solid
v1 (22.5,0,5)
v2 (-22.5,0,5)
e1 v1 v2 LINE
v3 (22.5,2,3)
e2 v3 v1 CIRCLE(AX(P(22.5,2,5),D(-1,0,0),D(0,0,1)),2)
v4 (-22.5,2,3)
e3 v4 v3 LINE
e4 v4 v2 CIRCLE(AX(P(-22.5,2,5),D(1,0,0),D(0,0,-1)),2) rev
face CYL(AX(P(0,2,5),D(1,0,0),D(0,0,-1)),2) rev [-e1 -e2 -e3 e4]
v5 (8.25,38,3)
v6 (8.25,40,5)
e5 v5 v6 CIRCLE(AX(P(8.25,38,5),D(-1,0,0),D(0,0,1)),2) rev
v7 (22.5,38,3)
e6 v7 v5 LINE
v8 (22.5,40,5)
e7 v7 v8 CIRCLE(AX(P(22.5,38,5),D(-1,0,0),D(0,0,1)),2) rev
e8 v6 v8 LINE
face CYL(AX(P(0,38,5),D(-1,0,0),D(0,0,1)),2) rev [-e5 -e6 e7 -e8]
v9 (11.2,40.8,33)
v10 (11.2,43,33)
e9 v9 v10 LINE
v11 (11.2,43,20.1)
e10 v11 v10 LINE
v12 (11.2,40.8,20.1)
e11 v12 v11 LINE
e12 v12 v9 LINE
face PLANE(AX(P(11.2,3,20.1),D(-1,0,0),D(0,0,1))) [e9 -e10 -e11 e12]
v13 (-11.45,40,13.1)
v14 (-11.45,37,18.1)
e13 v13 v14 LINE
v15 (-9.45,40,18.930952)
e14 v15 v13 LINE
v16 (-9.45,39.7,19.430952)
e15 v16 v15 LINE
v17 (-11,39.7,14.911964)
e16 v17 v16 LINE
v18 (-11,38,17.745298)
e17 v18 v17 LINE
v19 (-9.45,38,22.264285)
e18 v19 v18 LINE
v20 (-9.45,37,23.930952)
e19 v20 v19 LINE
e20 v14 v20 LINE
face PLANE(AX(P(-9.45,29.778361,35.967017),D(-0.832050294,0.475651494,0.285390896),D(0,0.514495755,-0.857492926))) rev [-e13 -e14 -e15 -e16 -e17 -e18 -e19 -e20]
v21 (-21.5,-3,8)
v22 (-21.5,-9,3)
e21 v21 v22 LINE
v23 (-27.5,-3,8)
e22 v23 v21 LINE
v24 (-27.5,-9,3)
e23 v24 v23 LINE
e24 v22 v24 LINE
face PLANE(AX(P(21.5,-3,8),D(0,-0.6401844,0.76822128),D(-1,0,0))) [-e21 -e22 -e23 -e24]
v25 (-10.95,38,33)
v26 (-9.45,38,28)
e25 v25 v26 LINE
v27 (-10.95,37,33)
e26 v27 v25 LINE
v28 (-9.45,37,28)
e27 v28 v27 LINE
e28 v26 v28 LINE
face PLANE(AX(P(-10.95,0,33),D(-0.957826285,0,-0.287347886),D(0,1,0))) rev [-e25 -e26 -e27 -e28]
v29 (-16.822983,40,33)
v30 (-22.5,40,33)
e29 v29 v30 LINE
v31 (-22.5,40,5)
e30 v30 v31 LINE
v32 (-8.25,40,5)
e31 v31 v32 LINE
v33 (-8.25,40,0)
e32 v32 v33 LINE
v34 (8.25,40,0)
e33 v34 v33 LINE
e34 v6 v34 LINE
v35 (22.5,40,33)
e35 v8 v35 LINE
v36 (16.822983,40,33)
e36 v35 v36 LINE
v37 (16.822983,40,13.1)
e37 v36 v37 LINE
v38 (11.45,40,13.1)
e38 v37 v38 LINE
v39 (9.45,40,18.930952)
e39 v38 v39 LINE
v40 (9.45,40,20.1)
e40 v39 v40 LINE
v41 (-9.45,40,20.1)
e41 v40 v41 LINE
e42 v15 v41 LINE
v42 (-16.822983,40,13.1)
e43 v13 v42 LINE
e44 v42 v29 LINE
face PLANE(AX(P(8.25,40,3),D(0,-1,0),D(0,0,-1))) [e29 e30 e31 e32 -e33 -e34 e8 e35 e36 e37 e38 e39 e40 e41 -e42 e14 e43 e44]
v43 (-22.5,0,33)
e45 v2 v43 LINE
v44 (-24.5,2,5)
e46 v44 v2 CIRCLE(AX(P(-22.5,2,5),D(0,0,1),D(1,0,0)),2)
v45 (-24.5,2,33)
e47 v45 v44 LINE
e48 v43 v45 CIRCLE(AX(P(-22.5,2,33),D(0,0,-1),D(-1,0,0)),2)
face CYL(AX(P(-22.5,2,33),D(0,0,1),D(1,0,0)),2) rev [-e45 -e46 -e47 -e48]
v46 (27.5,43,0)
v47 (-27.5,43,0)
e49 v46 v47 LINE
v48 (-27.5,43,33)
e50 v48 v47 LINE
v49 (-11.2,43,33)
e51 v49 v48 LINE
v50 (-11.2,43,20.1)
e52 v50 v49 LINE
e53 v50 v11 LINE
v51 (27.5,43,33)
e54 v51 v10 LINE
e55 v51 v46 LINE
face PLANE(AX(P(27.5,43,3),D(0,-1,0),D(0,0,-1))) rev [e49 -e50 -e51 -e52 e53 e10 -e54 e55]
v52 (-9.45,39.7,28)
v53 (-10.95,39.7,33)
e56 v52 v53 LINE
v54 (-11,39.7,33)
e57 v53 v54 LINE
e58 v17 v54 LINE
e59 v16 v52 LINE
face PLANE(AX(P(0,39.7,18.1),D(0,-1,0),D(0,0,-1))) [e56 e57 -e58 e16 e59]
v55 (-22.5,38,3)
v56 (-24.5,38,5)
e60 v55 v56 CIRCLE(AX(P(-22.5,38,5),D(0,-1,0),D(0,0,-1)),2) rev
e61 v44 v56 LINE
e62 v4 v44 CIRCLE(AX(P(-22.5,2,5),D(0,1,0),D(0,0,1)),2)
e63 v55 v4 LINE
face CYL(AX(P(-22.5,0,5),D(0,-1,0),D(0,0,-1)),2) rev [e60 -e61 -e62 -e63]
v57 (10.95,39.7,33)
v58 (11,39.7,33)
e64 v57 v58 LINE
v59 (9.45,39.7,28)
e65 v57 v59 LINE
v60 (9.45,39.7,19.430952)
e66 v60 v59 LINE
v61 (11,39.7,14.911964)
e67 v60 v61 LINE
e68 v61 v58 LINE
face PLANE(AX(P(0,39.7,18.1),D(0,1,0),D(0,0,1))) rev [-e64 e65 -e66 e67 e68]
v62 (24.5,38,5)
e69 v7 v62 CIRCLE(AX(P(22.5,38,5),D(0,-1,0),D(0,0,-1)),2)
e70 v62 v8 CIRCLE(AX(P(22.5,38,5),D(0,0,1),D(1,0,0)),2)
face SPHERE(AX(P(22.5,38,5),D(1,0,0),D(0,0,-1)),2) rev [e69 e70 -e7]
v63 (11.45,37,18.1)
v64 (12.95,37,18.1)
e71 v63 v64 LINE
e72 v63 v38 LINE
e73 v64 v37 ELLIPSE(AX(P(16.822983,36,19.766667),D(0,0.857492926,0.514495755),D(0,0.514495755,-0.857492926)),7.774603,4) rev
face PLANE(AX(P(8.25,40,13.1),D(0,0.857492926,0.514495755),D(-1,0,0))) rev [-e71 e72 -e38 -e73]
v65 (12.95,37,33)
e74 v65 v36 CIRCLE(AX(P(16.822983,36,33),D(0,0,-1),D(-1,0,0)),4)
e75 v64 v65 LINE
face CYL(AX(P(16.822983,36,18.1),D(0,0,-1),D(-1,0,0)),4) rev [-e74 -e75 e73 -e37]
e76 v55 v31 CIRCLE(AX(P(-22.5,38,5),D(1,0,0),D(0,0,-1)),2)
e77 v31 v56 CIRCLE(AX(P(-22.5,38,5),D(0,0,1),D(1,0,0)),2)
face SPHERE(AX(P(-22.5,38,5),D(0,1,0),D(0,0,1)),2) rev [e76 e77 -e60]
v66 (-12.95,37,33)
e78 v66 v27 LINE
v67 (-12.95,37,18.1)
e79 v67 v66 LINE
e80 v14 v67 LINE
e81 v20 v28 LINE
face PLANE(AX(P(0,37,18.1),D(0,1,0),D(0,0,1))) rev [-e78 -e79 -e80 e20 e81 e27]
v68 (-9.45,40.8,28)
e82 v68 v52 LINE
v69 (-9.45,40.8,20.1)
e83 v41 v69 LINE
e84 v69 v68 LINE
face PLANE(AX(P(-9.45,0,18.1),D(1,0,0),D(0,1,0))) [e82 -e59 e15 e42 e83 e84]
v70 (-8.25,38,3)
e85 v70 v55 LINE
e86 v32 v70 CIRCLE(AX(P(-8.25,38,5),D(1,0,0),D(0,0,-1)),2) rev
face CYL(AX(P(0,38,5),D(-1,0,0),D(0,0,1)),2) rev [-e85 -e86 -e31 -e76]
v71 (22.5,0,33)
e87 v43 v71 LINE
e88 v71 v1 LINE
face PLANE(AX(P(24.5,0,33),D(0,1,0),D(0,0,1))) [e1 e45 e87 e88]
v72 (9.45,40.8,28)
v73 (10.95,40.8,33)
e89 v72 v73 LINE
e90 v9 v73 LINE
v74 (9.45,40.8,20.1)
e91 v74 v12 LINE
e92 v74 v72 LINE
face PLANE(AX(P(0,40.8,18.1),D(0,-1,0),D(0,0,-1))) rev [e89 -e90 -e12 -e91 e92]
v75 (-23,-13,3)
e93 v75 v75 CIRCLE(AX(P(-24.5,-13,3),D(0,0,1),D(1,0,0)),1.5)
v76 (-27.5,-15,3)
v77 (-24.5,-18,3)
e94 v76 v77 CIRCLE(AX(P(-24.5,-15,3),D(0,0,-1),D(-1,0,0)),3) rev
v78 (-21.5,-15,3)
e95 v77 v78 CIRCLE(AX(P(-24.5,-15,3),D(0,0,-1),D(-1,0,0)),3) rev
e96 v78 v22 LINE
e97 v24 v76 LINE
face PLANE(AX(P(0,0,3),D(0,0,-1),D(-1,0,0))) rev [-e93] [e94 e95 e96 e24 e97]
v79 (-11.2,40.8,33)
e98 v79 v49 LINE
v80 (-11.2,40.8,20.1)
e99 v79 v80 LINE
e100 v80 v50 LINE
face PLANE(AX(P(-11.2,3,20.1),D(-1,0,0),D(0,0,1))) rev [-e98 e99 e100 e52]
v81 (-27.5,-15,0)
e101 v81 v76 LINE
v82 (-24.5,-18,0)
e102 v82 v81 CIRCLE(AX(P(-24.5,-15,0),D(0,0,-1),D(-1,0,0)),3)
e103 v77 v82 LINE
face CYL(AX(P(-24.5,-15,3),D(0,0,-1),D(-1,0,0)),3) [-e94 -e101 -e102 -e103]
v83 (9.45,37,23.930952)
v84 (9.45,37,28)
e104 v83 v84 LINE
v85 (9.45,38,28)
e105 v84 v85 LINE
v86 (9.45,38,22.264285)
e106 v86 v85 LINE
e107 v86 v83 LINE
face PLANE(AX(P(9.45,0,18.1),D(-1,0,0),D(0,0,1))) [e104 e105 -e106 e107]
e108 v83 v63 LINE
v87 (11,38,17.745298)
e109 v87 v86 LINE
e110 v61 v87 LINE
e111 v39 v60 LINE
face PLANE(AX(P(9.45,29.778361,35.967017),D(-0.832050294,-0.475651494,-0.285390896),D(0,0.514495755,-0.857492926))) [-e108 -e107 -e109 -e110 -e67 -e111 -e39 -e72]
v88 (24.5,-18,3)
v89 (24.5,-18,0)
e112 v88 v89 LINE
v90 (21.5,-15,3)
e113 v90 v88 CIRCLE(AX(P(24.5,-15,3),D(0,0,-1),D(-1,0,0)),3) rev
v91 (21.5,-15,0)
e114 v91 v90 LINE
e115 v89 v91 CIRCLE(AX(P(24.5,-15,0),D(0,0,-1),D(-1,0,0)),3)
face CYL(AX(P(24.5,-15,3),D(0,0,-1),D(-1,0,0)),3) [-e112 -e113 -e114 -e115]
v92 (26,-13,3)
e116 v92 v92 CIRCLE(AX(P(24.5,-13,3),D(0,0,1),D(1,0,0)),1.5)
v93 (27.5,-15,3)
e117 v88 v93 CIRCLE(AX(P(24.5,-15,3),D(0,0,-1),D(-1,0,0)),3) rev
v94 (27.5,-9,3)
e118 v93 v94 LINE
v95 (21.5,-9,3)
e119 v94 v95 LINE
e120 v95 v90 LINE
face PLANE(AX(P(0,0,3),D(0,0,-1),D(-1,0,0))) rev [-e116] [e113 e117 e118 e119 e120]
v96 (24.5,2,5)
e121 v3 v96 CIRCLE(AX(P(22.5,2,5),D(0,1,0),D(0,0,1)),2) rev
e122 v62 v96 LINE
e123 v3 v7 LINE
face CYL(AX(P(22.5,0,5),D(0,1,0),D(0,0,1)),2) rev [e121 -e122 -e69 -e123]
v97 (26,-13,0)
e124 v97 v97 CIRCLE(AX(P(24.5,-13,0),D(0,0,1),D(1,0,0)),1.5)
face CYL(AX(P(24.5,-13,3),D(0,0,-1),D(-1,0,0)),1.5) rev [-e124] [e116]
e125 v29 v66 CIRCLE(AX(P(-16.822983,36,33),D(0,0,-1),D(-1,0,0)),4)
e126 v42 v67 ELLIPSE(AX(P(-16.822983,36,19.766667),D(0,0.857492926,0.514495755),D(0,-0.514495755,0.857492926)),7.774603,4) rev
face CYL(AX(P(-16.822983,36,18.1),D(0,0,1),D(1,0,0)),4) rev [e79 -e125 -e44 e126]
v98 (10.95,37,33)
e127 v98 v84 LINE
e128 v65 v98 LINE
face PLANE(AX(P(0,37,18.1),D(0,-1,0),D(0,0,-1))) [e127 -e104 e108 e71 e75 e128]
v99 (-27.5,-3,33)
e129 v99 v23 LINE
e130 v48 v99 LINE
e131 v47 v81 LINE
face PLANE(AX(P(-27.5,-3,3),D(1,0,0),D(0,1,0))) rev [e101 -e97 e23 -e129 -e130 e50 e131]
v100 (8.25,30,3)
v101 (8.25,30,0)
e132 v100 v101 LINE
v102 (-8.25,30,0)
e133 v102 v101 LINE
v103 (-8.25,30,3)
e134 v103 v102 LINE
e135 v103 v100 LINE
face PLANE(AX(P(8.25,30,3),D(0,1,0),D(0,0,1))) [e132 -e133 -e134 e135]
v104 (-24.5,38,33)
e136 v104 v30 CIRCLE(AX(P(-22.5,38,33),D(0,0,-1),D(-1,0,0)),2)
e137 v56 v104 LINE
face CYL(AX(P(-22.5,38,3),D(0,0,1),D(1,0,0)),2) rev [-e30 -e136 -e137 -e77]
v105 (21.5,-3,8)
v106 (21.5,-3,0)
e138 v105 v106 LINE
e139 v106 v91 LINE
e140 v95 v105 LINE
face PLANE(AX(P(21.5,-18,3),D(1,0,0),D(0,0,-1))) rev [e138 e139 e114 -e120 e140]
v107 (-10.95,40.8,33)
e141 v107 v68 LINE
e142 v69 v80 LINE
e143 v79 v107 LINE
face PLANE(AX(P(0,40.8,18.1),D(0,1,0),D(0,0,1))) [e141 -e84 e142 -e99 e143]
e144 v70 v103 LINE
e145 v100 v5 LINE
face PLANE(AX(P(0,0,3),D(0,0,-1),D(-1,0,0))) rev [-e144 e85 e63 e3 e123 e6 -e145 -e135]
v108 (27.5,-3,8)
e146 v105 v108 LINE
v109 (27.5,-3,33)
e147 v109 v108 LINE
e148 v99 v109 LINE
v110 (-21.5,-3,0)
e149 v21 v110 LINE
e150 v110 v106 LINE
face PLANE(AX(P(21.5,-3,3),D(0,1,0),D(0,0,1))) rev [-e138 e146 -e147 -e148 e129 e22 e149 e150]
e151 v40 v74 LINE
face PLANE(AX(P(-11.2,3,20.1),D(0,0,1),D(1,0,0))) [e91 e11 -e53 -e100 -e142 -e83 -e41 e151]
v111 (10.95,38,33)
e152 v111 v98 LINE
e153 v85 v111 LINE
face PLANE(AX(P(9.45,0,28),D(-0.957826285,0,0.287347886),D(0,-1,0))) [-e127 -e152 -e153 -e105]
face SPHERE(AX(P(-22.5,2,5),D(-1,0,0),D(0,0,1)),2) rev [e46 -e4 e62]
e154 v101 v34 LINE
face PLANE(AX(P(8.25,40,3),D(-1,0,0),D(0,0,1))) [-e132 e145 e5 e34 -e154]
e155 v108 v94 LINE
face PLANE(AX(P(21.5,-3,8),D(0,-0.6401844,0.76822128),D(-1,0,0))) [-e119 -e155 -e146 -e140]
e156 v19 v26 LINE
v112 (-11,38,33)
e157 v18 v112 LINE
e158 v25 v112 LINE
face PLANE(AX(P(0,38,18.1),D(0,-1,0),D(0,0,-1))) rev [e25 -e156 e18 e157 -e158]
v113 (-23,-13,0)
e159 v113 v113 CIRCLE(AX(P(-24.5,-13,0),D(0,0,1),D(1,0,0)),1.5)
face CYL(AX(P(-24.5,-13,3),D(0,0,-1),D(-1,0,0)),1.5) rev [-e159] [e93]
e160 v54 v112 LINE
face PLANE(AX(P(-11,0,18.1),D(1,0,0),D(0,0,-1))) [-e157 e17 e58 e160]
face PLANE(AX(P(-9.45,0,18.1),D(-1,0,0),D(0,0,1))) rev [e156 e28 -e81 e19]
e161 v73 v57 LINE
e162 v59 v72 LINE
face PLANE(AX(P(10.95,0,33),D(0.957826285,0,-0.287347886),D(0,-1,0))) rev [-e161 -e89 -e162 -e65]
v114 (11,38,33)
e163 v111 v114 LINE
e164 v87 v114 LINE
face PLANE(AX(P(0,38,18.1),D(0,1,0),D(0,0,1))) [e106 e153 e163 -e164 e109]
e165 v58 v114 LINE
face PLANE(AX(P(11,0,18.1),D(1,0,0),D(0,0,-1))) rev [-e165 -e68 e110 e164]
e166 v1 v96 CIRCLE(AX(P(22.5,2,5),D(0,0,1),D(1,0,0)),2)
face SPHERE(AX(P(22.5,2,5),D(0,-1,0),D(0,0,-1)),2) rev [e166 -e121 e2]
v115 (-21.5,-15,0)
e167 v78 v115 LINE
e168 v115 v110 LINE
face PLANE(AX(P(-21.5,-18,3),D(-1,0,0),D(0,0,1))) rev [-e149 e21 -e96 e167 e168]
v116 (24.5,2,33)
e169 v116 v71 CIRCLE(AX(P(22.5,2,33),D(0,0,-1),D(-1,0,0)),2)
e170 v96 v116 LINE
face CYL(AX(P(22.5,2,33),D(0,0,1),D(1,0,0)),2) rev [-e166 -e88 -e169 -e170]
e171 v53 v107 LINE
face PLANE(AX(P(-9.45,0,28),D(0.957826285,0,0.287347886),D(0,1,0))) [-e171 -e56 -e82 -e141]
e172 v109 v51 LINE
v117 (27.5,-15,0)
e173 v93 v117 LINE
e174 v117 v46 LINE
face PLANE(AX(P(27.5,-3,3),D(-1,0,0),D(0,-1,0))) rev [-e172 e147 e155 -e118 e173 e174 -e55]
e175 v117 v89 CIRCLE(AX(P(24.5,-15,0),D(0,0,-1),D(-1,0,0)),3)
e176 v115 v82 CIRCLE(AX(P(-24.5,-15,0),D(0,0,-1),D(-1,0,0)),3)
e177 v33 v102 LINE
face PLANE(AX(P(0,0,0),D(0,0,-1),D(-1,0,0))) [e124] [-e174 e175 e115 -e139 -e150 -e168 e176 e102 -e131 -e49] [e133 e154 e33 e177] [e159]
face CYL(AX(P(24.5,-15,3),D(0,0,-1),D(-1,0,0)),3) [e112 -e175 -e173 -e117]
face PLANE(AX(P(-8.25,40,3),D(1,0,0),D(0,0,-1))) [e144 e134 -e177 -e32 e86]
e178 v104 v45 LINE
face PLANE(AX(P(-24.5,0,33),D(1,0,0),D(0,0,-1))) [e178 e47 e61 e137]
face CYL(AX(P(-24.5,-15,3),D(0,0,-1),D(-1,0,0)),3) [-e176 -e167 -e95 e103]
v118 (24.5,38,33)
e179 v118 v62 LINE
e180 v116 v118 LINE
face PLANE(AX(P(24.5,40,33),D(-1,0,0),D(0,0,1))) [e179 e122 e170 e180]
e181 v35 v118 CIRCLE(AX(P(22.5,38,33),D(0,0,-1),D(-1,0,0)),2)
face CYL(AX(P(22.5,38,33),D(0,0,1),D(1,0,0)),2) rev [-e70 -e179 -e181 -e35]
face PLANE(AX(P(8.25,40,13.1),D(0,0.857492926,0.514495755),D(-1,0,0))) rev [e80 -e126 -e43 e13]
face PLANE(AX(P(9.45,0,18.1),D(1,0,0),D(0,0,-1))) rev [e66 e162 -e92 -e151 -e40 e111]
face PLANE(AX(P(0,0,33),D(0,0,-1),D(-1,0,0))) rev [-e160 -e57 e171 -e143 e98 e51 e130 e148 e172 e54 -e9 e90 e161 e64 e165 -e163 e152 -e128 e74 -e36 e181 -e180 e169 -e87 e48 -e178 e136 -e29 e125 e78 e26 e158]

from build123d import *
from OCP.BRepFilletAPI import BRepFilletAPI_MakeChamfer

# Parameters (mm, degrees)
SKETCH_1_R           = 1.5
SKETCH_1_W           = 16.5
SKETCH_1_H           = 10
EXTRUDE_1_DEPTH      = 3
SKETCH_2_W           = 55
SKETCH_2_H           = 46
SKETCH_2_W_2         = 49
SKETCH_2_H_2         = 40
EXTRUDE_2_DEPTH      = 30
SKETCH_3_W           = 22.4
SKETCH_3_H           = 13.1
CUT_EXTRUDE_1_DEPTH  = 40
EXTRUDE_3_DEPTH      = 12.9
EXTRUDE_3_DEPTH_BACK = 2
FILLET_1_R           = 4
CHAMFER_1_SIZE       = 1.5
CHAMFER_1_SIZE2      = 5
CHAMFER_2_SIZE       = 5
CHAMFER_2_SIZE2      = 1.5
CHAMFER_3_SIZE       = 5
CHAMFER_3_SIZE_2     = 3
CHAMFER_6_SIZE       = 6
CHAMFER_6_SIZE2      = 5
FILLET_2_R           = 3
FILLET_3_R           = 2


# Some blends are built 0.0001 mm under size
with BuildPart() as part:
    # Эскиз1 → Бобышка-Вытянуть1 (new body)
    with BuildSketch(Plane.XY):
        Polygon((27.5, 43), (-27.5, 43), (-27.5, -3), (-27.5, -18), (-21.5, -18), (-21.5, -3), (21.5, -3), (21.5, -18), (27.5, -18), (27.5, -3), align=None)
        with Locations((-24.5, -13)):
            Circle(SKETCH_1_R, mode=Mode.SUBTRACT)
        with Locations((24.5, -13)):
            Circle(SKETCH_1_R, mode=Mode.SUBTRACT)
        with Locations((0, 35)):
            Rectangle(SKETCH_1_W, SKETCH_1_H, mode=Mode.SUBTRACT)
    extrude(amount=EXTRUDE_1_DEPTH)

    # Эскиз2 → Бобышка-Вытянуть2 (add)
    with BuildSketch(Plane.XY.offset(3)):
        with Locations((0, 20)):
            Rectangle(SKETCH_2_W, SKETCH_2_H)
        with Locations((0, 20)):
            Rectangle(SKETCH_2_W_2, SKETCH_2_H_2, mode=Mode.SUBTRACT)
    extrude(amount=EXTRUDE_2_DEPTH)

    # Эскиз3 → Вырез-Вытянуть1 (cut)
    with BuildSketch(Plane(origin=(0, 43, 0), x_dir=(1, 0, 0), z_dir=(0, 1, 0))):
        with Locations((0, -26.65)):
            Rectangle(SKETCH_3_W, SKETCH_3_H)
    extrude(amount=-CUT_EXTRUDE_1_DEPTH, mode=Mode.SUBTRACT)

    # Эскиз4 → Бобышка-Вытянуть3 (add, two sides: drawn at the far end of the back side and taken through both)
    with BuildSketch(Plane.XY.offset(20.1).offset(-EXTRUDE_3_DEPTH_BACK)):
        Polygon((11.2, 40), (11.2, 40.8), (11, 40.8), (9.45, 40.8), (9.45, 40), align=None)
        Polygon((11.2, 40), (9.45, 40), (9.45, 39.7), (11, 39.7), (11, 38), (9.45, 38), (9.45, 37), (12.95, 37), (12.95, 40), align=None)
        Polygon((-11.2, 40), (-9.45, 40), (-9.45, 40.8), (-11, 40.8), (-11.2, 40.8), align=None)
        Polygon((-9.45, 39.7), (-9.45, 40), (-11.2, 40), (-12.95, 40), (-12.95, 37), (-9.45, 37), (-9.45, 38), (-11, 38), (-11, 39.7), align=None)
    extrude(amount=EXTRUDE_3_DEPTH + EXTRUDE_3_DEPTH_BACK)

    # Скругление1
    # the kernel refuses this fillet: 4 mm, written as the material it adds along each edge
    with BuildSketch(Plane(origin=(-12.95, 40, 18.1), x_dir=(-1, 0, 0), z_dir=(0, 0, 1))) as fillet_1_piece_1:
        with BuildLine():
            CenterArc((3.872983346, 4), FILLET_1_R, 194.477512186, 75.522487814)
            Line((0, 3), (-0.077459667, 2.98))
            ThreePointArc((-0.077459667, 2.98), (-0.08, 1.5), (-0.08, 0))
            Line((-0.08, 0), (0, -0.08))
            Line((0, -0.08), (3.872983346, -0.08))
            Line((3.872983346, -0.08), (3.872983346, 0))
        make_face()
    extrude(amount=14.9)
    with BuildSketch(Plane(origin=(12.95, 40, 33), x_dir=(0, -1, 0), z_dir=(0, 0, -1))) as fillet_1_piece_2:
        with BuildLine():
            CenterArc((4, -3.872983346), FILLET_1_R, 104.477512186, 75.522487814)
            Line((0, -3.872983346), (-0.08, -3.872983346))
            Line((-0.08, -3.872983346), (-0.08, 0))
            Line((-0.08, 0), (0, 0.08))
            ThreePointArc((0, 0.08), (1.5, 0.08), (2.98, 0.077459667))
            Line((2.98, 0.077459667), (3, 0))
        make_face()
    extrude(amount=14.9)

    # Фаска1
    chamfer_1_edges = [part.edges().sort_by_distance(p)[0] for p in [
        (9.45, 37.5, 33),
        (-9.45, 40.25, 33),
        (-9.45, 37.5, 33),
    ]]
    chamfer_1_side = [part.faces().sort_by_distance(p)[0] for p in [
        (13.93441787, 39.729121995, 33),
    ]]
    chamfer(chamfer_1_edges, length=CHAMFER_1_SIZE, length2=CHAMFER_1_SIZE2, reference=chamfer_1_side[0])

    # Фаска2
    chamfer_2_edges = [part.edges().sort_by_distance(p)[0] for p in [
        (9.45, 40.25, 33),
    ]]
    chamfer_2_side = [part.faces().sort_by_distance(p)[0] for p in [
        (9.45, 40.233772819, 26.247768763),
    ]]
    chamfer(chamfer_2_edges, length=CHAMFER_2_SIZE, length2=CHAMFER_2_SIZE2, reference=chamfer_2_side[0])

    # Фаска3
    chamfer_3_edges_1 = [part.edges().sort_by_distance(p)[0] for p in [
        (13.136491673, 40, 18.1),
    ]]
    chamfer_3_side_1 = [part.faces().sort_by_distance(p)[0] for p in [
        (13.136491673, 40, 18.04),
    ]]
    chamfer_3_edges_2 = [part.edges().sort_by_distance(p)[0] for p in [
        (-13.136491673, 40, 18.1),
    ]]
    chamfer_3_side_2 = [part.faces().sort_by_distance(p)[0] for p in [
        (-13.136491673, 40, 18.04),
    ]]
    chamfer_3 = BRepFilletAPI_MakeChamfer(part.part.solid().wrapped)
    for e in chamfer_3_edges_1:
        chamfer_3.Add(CHAMFER_3_SIZE - 0.0001, CHAMFER_3_SIZE_2 - 0.0001, e.wrapped, chamfer_3_side_1[0].wrapped)
    for e in chamfer_3_edges_2:
        chamfer_3.Add(CHAMFER_3_SIZE - 0.0001, CHAMFER_3_SIZE_2 - 0.0001, e.wrapped, chamfer_3_side_2[0].wrapped)
    add(Compound.cast(chamfer_3.Shape()), mode=Mode.REPLACE)  # a hair under: the kernel refuses the full size

    # Фаска5
    # the kernel refuses this chamfer: 3, 2 mm, written as the material it takes off along each edge
    with BuildSketch(Plane(origin=(9.45, 41.988024108, 9.786682308), x_dir=(0, 0.8574959522145404, 0.514490711223904), z_dir=(0, -0.514490711223904, 0.8574959522145406))) as chamfer_5_piece_1_section:
        with BuildLine():
            Line((3.099846035, 0.066564024), (-0.099846035, -2.066564024))
            Line((-0.099846035, -2.066564024), (-0.159846035, -2.066564024))
            ThreePointArc((-0.159846035, -2.066564024), (-0.06, -1.033282012), (-0.06, 0))
            Line((-0.06, 0), (0, 0.06))
            ThreePointArc((0, 0.06), (1.549923018, 0.06), (3.099846035, 0.126564024))
            Line((3.099846035, 0.126564024), (3.099846035, 0.066564024))
        make_face()
    chamfer_5_piece_1 = extrude(amount=17.446278464, mode=Mode.PRIVATE)
    chamfer_5_piece_1 = split(chamfer_5_piece_1, bisect_by=Plane(origin=(9.45, 40, 9.786682308), z_dir=(0, -1, 0)), keep=Keep.TOP, mode=Mode.PRIVATE)
    add(chamfer_5_piece_1, mode=Mode.SUBTRACT)
    with BuildSketch(Plane(origin=(-9.45, 41.988024108, 9.786682308), x_dir=(-1, 0, 0), z_dir=(0, -0.514490711223904, 0.8574959522145406))) as chamfer_5_piece_2_section:
        with BuildLine():
            Line((2.066564024, 0.099846035), (-0.066564024, -3.099846035))
            Line((-0.066564024, -3.099846035), (-0.126564024, -3.099846035))
            ThreePointArc((-0.126564024, -3.099846035), (-0.06, -1.549923018), (-0.06, 0))
            Line((-0.06, 0), (0, 0.06))
            ThreePointArc((0, 0.06), (1.033282012, 0.06), (2.066564024, 0.159846035))
            Line((2.066564024, 0.159846035), (2.066564024, 0.099846035))
        make_face()
    chamfer_5_piece_2 = extrude(amount=17.446278464, mode=Mode.PRIVATE)
    chamfer_5_piece_2 = split(chamfer_5_piece_2, bisect_by=Plane(origin=(-9.45, 40, 9.786682308), z_dir=(0, -1, 0)), keep=Keep.TOP, mode=Mode.PRIVATE)
    add(chamfer_5_piece_2, mode=Mode.SUBTRACT)

    # Фаска6: one chamfer whose edges measure the first distance from different faces: ONE call of the kernel's chamfer builder (chamfer() names one face for all edges)
    chamfer_6_edges_1 = [part.edges().sort_by_distance(p)[0] for p in [
        (24.5, -3, 3),
    ]]
    chamfer_6_side_1 = [part.faces().sort_by_distance(p)[0] for p in [
        (24.5, -10.286914786, 3),
    ]]
    chamfer_6_edges_2 = [part.edges().sort_by_distance(p)[0] for p in [
        (-24.5, -3, 3),
    ]]
    chamfer_6_side_2 = [part.faces().sort_by_distance(p)[0] for p in [
        (-24.5, -10.286914786, 3),
    ]]
    chamfer_6 = BRepFilletAPI_MakeChamfer(part.part.solid().wrapped)
    for e in chamfer_6_edges_1:
        chamfer_6.Add(CHAMFER_6_SIZE, CHAMFER_6_SIZE2, e.wrapped, chamfer_6_side_1[0].wrapped)  # the first distance lies on this face
    for e in chamfer_6_edges_2:
        chamfer_6.Add(CHAMFER_6_SIZE, CHAMFER_6_SIZE2, e.wrapped, chamfer_6_side_2[0].wrapped)  # the first distance lies on this face
    add(Compound.cast(chamfer_6.Shape()), mode=Mode.REPLACE)

    # Скругление2
    fillet_2_edges = [part.edges().sort_by_distance(p)[0] for p in [
        (27.5, -18, 1.5),
        (21.5, -18, 1.5),
        (-21.5, -18, 1.5),
        (-27.5, -18, 1.5),
    ]]
    fillet(fillet_2_edges, radius=FILLET_2_R - 0.0001)  # a hair under: the kernel refuses the full size

    # Скругление3
    fillet_3_edges = [part.edges().sort_by_distance(p)[0] for p in [
        (-16.375, 40, 3),
        (16.375, 40, 3),
        (-24.5, 20, 3),
        (0, 0, 3),
        (24.5, 20, 3),
        (-24.5, 0, 18),
        (24.5, 0, 18),
        (24.5, 40, 18),
        (-24.5, 40, 18),
    ]]
    fillet(fillet_3_edges, radius=FILLET_3_R)


solid = part.part
